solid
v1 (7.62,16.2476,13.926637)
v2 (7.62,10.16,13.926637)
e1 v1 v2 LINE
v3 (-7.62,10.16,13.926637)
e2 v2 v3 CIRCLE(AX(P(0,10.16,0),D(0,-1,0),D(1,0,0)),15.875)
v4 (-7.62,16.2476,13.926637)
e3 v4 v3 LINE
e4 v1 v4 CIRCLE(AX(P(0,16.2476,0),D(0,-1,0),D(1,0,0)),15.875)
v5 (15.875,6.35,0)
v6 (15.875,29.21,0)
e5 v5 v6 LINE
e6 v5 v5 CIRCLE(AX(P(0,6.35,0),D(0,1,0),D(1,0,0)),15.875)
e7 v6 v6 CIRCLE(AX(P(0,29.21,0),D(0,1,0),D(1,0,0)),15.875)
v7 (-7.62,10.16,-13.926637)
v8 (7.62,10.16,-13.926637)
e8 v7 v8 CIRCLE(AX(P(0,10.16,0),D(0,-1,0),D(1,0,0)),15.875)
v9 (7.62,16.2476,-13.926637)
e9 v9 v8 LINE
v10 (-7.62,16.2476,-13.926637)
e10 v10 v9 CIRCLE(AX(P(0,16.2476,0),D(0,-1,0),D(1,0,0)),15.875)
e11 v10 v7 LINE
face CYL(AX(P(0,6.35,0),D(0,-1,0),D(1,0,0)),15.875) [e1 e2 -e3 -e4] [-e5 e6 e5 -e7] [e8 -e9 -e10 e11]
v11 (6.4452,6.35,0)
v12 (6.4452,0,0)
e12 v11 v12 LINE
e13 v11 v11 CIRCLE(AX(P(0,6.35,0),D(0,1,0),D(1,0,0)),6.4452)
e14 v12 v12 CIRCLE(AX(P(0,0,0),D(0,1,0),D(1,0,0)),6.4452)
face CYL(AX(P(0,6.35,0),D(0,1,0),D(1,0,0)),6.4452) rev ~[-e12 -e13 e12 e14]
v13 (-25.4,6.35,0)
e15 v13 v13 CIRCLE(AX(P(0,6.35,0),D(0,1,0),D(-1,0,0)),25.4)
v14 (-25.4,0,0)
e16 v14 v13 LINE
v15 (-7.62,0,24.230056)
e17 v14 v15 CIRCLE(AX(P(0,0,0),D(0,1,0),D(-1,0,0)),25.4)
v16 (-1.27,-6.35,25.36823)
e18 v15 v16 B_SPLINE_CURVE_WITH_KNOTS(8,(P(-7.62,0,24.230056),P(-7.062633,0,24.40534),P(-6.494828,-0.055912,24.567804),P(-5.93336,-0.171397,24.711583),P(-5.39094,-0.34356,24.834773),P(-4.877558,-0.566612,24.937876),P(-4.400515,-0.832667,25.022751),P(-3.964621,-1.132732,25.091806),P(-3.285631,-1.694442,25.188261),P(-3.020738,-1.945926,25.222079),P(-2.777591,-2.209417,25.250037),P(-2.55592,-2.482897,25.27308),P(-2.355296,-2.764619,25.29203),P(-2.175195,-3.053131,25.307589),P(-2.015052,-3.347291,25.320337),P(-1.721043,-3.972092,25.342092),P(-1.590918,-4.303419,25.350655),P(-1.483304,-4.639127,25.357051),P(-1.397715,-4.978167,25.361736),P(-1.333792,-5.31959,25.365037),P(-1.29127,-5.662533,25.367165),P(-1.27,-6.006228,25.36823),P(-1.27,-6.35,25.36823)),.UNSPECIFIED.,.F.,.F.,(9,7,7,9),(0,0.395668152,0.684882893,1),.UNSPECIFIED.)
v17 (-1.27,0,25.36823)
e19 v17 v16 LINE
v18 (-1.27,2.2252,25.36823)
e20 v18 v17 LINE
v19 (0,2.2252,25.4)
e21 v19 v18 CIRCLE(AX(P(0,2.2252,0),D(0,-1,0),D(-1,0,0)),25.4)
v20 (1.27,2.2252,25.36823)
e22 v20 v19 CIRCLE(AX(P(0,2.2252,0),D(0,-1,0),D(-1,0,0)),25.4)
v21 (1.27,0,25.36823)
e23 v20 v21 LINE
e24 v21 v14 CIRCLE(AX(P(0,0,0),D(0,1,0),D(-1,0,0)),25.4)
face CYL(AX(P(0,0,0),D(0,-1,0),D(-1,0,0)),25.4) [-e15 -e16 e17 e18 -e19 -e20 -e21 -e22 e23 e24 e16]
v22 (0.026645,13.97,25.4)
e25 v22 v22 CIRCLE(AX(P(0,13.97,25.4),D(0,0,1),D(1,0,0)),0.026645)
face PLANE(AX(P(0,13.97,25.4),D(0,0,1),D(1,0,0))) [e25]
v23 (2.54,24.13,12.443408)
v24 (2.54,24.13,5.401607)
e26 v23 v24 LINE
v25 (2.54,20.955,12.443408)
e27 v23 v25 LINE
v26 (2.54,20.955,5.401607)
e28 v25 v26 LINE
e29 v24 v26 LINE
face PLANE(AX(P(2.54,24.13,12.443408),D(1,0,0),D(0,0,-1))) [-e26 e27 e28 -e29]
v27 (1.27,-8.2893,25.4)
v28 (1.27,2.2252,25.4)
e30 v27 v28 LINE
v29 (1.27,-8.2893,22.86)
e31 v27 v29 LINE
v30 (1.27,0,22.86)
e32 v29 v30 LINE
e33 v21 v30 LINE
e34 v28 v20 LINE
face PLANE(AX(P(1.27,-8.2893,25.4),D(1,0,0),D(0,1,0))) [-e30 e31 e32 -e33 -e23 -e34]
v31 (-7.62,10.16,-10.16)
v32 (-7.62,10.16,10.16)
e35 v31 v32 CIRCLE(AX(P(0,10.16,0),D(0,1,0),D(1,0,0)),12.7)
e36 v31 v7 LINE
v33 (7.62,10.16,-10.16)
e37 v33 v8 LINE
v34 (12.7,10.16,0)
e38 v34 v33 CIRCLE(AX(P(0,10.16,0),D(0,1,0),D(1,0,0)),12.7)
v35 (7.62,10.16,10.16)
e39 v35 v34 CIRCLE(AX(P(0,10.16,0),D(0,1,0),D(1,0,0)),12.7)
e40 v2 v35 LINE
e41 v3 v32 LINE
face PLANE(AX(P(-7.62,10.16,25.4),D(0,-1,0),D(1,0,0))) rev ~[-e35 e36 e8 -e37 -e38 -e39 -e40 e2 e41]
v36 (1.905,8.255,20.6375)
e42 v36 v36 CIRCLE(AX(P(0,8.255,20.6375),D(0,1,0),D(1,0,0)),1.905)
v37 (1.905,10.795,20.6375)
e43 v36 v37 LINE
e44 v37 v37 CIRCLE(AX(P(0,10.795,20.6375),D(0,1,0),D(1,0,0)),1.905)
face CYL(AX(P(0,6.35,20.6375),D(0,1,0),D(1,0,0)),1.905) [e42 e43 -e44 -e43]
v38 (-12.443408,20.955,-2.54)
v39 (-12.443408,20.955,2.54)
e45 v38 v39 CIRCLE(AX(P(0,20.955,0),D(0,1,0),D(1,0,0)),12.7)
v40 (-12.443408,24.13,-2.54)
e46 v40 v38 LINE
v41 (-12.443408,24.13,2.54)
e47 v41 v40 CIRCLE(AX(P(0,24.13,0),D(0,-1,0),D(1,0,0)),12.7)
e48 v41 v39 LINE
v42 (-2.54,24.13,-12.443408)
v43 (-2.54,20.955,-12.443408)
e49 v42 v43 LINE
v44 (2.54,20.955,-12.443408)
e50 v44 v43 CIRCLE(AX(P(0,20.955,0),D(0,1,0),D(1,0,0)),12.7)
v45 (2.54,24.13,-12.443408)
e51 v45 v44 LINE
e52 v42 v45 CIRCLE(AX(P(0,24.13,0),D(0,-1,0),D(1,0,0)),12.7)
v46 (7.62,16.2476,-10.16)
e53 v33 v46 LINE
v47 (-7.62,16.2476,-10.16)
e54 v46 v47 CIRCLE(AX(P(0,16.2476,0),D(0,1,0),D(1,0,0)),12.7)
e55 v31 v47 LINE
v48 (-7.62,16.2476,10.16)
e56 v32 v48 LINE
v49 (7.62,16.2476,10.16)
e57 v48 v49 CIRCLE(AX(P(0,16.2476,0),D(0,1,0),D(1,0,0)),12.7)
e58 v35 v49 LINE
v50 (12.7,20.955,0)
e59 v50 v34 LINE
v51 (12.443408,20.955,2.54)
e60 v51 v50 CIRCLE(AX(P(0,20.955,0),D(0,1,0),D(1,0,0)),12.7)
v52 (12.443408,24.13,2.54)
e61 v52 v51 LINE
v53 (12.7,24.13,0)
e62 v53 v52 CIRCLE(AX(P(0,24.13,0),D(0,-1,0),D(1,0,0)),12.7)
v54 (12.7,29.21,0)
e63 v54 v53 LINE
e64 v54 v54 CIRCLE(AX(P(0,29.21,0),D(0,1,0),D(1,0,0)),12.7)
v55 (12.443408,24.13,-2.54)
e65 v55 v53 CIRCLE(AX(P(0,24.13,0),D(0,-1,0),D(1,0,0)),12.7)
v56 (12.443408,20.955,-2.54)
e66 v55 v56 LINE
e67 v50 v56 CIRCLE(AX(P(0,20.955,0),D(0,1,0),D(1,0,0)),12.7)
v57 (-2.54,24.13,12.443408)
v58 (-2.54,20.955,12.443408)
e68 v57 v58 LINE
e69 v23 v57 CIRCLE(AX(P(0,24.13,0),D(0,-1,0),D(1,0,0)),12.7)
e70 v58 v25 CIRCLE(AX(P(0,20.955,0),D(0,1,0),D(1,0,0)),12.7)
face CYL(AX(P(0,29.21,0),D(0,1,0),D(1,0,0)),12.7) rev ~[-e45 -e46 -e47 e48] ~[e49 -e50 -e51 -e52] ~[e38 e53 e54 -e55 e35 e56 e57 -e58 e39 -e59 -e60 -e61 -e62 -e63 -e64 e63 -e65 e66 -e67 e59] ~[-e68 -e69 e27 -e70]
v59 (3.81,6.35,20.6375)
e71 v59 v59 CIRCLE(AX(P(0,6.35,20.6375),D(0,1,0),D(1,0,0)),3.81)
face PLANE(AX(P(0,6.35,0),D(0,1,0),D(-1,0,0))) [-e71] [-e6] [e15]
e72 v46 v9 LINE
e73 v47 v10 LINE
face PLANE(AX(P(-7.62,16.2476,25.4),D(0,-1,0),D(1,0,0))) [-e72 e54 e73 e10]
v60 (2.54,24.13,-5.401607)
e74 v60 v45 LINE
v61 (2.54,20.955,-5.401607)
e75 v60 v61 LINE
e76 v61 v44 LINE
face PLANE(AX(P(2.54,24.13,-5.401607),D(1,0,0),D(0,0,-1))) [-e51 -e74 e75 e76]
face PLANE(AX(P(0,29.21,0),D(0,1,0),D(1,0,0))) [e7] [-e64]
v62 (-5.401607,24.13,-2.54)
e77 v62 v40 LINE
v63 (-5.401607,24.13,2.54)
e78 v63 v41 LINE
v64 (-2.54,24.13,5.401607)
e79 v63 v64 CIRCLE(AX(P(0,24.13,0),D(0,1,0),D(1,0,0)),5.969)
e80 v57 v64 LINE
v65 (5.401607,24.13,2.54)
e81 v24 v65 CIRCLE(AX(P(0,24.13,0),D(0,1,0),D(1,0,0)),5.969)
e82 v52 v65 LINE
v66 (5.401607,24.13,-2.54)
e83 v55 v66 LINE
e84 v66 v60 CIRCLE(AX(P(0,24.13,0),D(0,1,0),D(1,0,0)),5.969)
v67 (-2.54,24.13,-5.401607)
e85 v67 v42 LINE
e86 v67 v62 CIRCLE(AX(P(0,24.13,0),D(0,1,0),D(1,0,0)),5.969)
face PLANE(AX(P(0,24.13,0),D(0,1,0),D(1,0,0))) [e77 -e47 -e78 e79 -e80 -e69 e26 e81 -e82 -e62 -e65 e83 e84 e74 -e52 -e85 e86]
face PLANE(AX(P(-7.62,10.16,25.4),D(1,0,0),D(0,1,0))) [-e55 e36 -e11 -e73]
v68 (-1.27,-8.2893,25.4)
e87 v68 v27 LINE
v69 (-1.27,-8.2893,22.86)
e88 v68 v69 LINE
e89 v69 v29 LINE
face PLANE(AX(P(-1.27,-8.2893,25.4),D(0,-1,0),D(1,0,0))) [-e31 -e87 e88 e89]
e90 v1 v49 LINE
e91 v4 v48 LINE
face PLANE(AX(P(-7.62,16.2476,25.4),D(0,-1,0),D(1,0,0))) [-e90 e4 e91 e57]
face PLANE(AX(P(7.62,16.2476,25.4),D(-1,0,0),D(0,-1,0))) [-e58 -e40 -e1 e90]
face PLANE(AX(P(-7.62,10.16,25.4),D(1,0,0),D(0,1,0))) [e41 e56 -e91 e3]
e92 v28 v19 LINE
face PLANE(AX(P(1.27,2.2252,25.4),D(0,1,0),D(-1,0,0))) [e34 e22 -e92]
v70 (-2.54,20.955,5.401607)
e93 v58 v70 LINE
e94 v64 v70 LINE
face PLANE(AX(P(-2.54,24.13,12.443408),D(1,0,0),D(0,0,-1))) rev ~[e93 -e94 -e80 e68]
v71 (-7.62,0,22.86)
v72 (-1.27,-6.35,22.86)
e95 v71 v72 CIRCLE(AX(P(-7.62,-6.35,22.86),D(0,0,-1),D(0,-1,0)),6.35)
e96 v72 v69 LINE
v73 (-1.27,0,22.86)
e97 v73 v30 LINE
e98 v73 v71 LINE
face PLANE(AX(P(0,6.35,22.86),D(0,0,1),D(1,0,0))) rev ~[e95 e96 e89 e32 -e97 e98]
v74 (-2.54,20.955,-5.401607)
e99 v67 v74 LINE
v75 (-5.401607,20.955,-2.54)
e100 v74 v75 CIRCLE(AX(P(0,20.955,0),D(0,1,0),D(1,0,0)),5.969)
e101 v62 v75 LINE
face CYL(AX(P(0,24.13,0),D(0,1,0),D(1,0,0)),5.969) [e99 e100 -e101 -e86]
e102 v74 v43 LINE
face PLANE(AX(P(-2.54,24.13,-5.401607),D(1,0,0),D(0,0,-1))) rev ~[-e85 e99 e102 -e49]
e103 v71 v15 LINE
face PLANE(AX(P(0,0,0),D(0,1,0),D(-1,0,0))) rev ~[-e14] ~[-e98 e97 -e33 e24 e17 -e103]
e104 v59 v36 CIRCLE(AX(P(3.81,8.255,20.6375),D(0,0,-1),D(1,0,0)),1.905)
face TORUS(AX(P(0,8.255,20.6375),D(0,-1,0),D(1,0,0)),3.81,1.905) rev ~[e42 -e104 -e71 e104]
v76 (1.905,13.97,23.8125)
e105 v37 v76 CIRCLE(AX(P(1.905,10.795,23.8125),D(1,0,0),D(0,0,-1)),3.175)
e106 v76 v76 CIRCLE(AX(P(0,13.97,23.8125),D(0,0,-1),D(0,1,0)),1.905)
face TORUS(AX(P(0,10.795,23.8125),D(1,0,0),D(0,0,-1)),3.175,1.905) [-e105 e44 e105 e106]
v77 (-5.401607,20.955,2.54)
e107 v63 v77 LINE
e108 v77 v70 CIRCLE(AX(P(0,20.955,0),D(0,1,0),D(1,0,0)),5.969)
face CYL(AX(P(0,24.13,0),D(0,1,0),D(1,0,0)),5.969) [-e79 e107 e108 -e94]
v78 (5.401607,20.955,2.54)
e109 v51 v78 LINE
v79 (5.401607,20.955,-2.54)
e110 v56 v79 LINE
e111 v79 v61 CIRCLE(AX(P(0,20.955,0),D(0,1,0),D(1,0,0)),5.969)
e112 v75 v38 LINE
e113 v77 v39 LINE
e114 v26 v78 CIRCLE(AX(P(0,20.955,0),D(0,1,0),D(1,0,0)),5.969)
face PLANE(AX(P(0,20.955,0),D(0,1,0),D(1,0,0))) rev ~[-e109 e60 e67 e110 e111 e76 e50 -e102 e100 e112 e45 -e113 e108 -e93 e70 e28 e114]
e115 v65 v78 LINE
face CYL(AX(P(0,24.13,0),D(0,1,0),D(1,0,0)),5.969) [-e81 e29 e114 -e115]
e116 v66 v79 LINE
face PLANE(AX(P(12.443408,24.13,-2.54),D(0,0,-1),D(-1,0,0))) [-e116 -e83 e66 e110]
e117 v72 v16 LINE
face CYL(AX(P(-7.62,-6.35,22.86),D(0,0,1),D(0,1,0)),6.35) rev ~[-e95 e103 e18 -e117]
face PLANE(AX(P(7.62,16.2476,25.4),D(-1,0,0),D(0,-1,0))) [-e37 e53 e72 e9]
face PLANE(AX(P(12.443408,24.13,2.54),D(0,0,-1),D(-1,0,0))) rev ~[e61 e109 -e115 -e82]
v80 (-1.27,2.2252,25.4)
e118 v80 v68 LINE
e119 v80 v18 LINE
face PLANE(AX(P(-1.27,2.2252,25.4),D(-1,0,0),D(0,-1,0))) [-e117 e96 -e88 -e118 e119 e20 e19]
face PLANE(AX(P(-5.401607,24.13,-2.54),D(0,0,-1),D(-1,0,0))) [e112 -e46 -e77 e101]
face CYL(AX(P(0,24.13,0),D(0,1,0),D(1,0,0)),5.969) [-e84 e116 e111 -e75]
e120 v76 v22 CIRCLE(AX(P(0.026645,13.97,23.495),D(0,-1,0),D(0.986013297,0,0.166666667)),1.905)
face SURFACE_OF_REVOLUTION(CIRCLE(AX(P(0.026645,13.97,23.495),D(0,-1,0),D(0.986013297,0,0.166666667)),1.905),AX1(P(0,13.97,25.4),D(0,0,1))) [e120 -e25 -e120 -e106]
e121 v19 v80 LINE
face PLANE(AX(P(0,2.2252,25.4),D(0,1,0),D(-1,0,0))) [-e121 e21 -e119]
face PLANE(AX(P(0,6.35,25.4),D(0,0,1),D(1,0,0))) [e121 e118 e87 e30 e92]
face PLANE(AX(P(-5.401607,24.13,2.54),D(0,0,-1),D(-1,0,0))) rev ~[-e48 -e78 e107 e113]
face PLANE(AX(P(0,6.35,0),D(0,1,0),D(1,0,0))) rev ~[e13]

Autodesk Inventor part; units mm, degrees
sketch "Sketch1" plane through (0, 0, 0) normal (0, 1, 0) x (-1, 0, 0)
  circle A0 centre (0, 0) radius 25.4
  dimension "d0" = 50.8
extrude "Extrusion1" add sketch "Sketch1" along normal blind 6.35
sketch "Sketch2" plane through (0, 6.35, 0) normal (0, 1, 0) x (1, 0, 0)
  circle A0 centre (0, 0) radius 25.4 projected
  point P0 (-25.4, 0)
  point P1 (0, -25.4)
  point P2 (25.4, 0)
  point P3 (0, 25.4)
ref_plane "Work Plane1" through (0, 6.35, 25.4) normal (0, 0, 1) x (1, 0, 0)
sketch "Sketch3" plane through (0, 6.35, 25.4) normal (0, 0, 1) x (1, 0, 0)
  line L0 (1.27, -4.1248) -> (-1.27, -4.1248)
  line L1 (-1.27, -4.1248) -> (-1.27, -14.6393)
  line L2 (-1.27, -14.6393) -> (1.27, -14.6393)
  line L3 (1.27, -14.6393) -> (1.27, -4.1248)
  line L4 (25.4, 0) -> (-25.4, 0) projected
  line L5 (0, 0) -> (0, -6.35)
  dimension "d3" = 1.27
  dimension "d4" = 2.54
extrude "Extrusion2" add sketch "Sketch3" against normal blind 2.54
sketch "Sketch4" plane through (0, 6.35, 0) normal (0, 1, 0) x (1, 0, 0)
  circle A0 centre (0, 0) radius 6.4452
  dimension "d9" = 12.8905
extrude "Extrusion3" cut sketch "Sketch4" against normal blind 25.4
sketch "Sketch5" plane through (0, 6.35, 0) normal (0, 1, 0) x (1, 0, 0)
  circle A0 centre (0, 0) radius 15.875
  dimension "d12" = 31.75
extrude "Extrusion4" add sketch "Sketch5" along normal blind 22.86
sketch "Sketch6" plane through (0, 29.21, 0) normal (0, 1, 0) x (1, 0, 0)
  circle A0 centre (0, 0) radius 12.7
  dimension "d15" = 25.4
extrude "Extrusion5" cut sketch "Sketch6" against normal blind 19.05
sketch "Sketch7" plane through (0, 0, 0) normal (0, -1, 0) x (1, 0, 0)
  point P0 (0, 0)
sketch "Sketch8" plane through (0, 0, 0) normal (0, -1, 0) x (1, 0, 0)
  point P0 (0, 0)
sketch "Sketch9" plane through (0, 0, 0) normal (0, -1, 0) x (1, 0, 0)
  point P0 (0, 0)
sketch "Sketch10" plane through (0, 0, 0) normal (0, -1, 0) x (1, 0, 0)
  point P0 (0, 0)
ref_plane "Work Plane2" through (0, 24.13, 0) normal (0, 1, 0) x (1, 0, 0)
sketch "Sketch13" plane through (0, 24.13, 0) normal (0, 1, 0) x (1, 0, 0)
  circle A0 centre (0, 0) radius 12.7
  circle A1 centre (0, 0) radius 12.7 projected
  circle A2 centre (0, 0) radius 5.969
  line L0 (0, 12.7) -> (2.54, 12.7)
  line L1 (0, 12.7) -> (-2.54, 12.7)
  line L2 (0, -12.7) -> (2.54, -12.7)
  line L3 (2.54, -12.7) -> (2.54, 12.7)
  line L4 (0, -12.7) -> (-2.54, -12.7)
  line L5 (-2.54, -12.7) -> (-2.54, 12.7)
  line L6 (12.7, -2.54) -> (-12.7, -2.54)
  line L7 (-12.7, 0) -> (-12.7, -2.54)
  line L8 (-12.7, 0) -> (-12.7, 2.54)
  line L9 (12.7, 2.54) -> (-12.7, 2.54)
  line L10 (12.7, 0) -> (12.7, 2.54)
  line L11 (12.7, 0) -> (12.7, -2.54)
  point P0 (12.4434, -2.54)
  point P1 (5.4016, -2.54)
  point P2 (2.54, -5.4016)
  point P3 (2.54, -12.4434)
  point P4 (-5.4016, -2.54)
  point P5 (-12.4434, -2.54)
  point P6 (-2.54, -12.4434)
  point P7 (-2.54, -5.4016)
  point P8 (5.4016, 2.54)
  point P9 (12.4434, 2.54)
  point P10 (2.54, 12.4434)
  point P11 (2.54, 5.4016)
  point P12 (-12.4434, 2.54)
  point P13 (-5.4016, 2.54)
  point P14 (-2.54, 5.4016)
  point P15 (-2.54, 12.4434)
  dimension "d22" = 11.938
  dimension "d28" = 2.54
  dimension "d29" = 2.54
  dimension "d32" = 90
extrude "Extrusion6" add sketch "Sketch13" against normal blind 3.175 contours A0 L6 A2 L9 | L9 A2 L3 A0 | A0 L3 A2 L6 | L3 A2 L5 A0 | L9 L3 A2 | A2 L6 L3 L9 | A0 L5 A2 L3 | A2 L3 L6 | L3 L9 L5 A2 | L3 L6 L5 L9 | A2 L5 L6 L3 | L5 A2 L9 A0 | L5 L9 A2 | L5 L6 A2 L9 | A0 L6 A2 L5 | A2 L6 L5 | L9 A2 L6 A0
extrude "Extrusion7" cut sketch "Sketch13" against normal blind 3.175 contours L9 A2 L3 A0 | A0 L3 A2 L6 | L5 A2 L9 A0 | A0 L6 A2 L5
sketch "Sketch14" plane through (0, 6.35, 25.4) normal (0, 0, 1) x (1, 0, 0)
  line L0 (-12.7, 3.81) -> (12.7, 3.81) projected
  line L1 (-7.62, 9.8976) -> (7.62, 9.8976)
  line L2 (7.62, 9.8976) -> (7.62, 3.81)
  line L3 (7.62, 3.81) -> (-7.62, 3.81)
  line L4 (-7.62, 3.81) -> (-7.62, 9.8976)
  point P0 (0, -6.35)
  point P1 (-7.62, 3.81)
  dimension "d36" = 15.24
  dimension "d37" = 7.62
extrude "Extrusion8" cut sketch "Sketch14" against normal through all
sketch "Sketch15" plane through (0, 6.35, 0) normal (0, 1, 0) x (1, 0, 0)
  circle A0 centre (0, -20.6375) radius 1.905
  circle A1 centre (0, 0) radius 15.875 projected
  circle A2 centre (0, 0) radius 25.4 projected
  dimension "d40" = 3.81
ref_plane "Work Plane4" through (0, 20.955, 12.4434) normal (1, 0, 0) x (0, 0, -1)
sketch "Sketch17" plane through (0, 20.955, 12.4434) normal (1, 0, 0) x (0, 0, -1)
  line L0 (-6.2891, -14.605) -> (-10.0991, -14.605) projected
  line L1 (-8.1941, -14.605) -> (-8.1941, -10.16)
  line L2 (-11.3691, -6.985) -> (-12.9566, -6.985)
  arc A0 (-8.1941, -10.16) -> (-11.3691, -6.985) centre (-11.3691, -10.16) ccw
  point P0 (12.4434, -20.955)
  point P1 (-8.1941, -6.985)
  dimension "d46" = 7.62
  dimension "d47" = 4.7625
  dimension "d48" = 3.175
sweep "Sweep1" add profiles "Sketch15" path "Sketch17" path curves L1 A0 L2 contours A0
fillet "Fillet1" radius 1.905 1 edges at (-1.905, 13.97, 25.4)
fillet "Fillet2" radius 1.905 1 edges at (-1.905, 6.35, 20.6375)
fillet "Fillet3" radius 6.35 1 edges at (-1.27, 0, 24.1141)
properties part number "Wheel"
